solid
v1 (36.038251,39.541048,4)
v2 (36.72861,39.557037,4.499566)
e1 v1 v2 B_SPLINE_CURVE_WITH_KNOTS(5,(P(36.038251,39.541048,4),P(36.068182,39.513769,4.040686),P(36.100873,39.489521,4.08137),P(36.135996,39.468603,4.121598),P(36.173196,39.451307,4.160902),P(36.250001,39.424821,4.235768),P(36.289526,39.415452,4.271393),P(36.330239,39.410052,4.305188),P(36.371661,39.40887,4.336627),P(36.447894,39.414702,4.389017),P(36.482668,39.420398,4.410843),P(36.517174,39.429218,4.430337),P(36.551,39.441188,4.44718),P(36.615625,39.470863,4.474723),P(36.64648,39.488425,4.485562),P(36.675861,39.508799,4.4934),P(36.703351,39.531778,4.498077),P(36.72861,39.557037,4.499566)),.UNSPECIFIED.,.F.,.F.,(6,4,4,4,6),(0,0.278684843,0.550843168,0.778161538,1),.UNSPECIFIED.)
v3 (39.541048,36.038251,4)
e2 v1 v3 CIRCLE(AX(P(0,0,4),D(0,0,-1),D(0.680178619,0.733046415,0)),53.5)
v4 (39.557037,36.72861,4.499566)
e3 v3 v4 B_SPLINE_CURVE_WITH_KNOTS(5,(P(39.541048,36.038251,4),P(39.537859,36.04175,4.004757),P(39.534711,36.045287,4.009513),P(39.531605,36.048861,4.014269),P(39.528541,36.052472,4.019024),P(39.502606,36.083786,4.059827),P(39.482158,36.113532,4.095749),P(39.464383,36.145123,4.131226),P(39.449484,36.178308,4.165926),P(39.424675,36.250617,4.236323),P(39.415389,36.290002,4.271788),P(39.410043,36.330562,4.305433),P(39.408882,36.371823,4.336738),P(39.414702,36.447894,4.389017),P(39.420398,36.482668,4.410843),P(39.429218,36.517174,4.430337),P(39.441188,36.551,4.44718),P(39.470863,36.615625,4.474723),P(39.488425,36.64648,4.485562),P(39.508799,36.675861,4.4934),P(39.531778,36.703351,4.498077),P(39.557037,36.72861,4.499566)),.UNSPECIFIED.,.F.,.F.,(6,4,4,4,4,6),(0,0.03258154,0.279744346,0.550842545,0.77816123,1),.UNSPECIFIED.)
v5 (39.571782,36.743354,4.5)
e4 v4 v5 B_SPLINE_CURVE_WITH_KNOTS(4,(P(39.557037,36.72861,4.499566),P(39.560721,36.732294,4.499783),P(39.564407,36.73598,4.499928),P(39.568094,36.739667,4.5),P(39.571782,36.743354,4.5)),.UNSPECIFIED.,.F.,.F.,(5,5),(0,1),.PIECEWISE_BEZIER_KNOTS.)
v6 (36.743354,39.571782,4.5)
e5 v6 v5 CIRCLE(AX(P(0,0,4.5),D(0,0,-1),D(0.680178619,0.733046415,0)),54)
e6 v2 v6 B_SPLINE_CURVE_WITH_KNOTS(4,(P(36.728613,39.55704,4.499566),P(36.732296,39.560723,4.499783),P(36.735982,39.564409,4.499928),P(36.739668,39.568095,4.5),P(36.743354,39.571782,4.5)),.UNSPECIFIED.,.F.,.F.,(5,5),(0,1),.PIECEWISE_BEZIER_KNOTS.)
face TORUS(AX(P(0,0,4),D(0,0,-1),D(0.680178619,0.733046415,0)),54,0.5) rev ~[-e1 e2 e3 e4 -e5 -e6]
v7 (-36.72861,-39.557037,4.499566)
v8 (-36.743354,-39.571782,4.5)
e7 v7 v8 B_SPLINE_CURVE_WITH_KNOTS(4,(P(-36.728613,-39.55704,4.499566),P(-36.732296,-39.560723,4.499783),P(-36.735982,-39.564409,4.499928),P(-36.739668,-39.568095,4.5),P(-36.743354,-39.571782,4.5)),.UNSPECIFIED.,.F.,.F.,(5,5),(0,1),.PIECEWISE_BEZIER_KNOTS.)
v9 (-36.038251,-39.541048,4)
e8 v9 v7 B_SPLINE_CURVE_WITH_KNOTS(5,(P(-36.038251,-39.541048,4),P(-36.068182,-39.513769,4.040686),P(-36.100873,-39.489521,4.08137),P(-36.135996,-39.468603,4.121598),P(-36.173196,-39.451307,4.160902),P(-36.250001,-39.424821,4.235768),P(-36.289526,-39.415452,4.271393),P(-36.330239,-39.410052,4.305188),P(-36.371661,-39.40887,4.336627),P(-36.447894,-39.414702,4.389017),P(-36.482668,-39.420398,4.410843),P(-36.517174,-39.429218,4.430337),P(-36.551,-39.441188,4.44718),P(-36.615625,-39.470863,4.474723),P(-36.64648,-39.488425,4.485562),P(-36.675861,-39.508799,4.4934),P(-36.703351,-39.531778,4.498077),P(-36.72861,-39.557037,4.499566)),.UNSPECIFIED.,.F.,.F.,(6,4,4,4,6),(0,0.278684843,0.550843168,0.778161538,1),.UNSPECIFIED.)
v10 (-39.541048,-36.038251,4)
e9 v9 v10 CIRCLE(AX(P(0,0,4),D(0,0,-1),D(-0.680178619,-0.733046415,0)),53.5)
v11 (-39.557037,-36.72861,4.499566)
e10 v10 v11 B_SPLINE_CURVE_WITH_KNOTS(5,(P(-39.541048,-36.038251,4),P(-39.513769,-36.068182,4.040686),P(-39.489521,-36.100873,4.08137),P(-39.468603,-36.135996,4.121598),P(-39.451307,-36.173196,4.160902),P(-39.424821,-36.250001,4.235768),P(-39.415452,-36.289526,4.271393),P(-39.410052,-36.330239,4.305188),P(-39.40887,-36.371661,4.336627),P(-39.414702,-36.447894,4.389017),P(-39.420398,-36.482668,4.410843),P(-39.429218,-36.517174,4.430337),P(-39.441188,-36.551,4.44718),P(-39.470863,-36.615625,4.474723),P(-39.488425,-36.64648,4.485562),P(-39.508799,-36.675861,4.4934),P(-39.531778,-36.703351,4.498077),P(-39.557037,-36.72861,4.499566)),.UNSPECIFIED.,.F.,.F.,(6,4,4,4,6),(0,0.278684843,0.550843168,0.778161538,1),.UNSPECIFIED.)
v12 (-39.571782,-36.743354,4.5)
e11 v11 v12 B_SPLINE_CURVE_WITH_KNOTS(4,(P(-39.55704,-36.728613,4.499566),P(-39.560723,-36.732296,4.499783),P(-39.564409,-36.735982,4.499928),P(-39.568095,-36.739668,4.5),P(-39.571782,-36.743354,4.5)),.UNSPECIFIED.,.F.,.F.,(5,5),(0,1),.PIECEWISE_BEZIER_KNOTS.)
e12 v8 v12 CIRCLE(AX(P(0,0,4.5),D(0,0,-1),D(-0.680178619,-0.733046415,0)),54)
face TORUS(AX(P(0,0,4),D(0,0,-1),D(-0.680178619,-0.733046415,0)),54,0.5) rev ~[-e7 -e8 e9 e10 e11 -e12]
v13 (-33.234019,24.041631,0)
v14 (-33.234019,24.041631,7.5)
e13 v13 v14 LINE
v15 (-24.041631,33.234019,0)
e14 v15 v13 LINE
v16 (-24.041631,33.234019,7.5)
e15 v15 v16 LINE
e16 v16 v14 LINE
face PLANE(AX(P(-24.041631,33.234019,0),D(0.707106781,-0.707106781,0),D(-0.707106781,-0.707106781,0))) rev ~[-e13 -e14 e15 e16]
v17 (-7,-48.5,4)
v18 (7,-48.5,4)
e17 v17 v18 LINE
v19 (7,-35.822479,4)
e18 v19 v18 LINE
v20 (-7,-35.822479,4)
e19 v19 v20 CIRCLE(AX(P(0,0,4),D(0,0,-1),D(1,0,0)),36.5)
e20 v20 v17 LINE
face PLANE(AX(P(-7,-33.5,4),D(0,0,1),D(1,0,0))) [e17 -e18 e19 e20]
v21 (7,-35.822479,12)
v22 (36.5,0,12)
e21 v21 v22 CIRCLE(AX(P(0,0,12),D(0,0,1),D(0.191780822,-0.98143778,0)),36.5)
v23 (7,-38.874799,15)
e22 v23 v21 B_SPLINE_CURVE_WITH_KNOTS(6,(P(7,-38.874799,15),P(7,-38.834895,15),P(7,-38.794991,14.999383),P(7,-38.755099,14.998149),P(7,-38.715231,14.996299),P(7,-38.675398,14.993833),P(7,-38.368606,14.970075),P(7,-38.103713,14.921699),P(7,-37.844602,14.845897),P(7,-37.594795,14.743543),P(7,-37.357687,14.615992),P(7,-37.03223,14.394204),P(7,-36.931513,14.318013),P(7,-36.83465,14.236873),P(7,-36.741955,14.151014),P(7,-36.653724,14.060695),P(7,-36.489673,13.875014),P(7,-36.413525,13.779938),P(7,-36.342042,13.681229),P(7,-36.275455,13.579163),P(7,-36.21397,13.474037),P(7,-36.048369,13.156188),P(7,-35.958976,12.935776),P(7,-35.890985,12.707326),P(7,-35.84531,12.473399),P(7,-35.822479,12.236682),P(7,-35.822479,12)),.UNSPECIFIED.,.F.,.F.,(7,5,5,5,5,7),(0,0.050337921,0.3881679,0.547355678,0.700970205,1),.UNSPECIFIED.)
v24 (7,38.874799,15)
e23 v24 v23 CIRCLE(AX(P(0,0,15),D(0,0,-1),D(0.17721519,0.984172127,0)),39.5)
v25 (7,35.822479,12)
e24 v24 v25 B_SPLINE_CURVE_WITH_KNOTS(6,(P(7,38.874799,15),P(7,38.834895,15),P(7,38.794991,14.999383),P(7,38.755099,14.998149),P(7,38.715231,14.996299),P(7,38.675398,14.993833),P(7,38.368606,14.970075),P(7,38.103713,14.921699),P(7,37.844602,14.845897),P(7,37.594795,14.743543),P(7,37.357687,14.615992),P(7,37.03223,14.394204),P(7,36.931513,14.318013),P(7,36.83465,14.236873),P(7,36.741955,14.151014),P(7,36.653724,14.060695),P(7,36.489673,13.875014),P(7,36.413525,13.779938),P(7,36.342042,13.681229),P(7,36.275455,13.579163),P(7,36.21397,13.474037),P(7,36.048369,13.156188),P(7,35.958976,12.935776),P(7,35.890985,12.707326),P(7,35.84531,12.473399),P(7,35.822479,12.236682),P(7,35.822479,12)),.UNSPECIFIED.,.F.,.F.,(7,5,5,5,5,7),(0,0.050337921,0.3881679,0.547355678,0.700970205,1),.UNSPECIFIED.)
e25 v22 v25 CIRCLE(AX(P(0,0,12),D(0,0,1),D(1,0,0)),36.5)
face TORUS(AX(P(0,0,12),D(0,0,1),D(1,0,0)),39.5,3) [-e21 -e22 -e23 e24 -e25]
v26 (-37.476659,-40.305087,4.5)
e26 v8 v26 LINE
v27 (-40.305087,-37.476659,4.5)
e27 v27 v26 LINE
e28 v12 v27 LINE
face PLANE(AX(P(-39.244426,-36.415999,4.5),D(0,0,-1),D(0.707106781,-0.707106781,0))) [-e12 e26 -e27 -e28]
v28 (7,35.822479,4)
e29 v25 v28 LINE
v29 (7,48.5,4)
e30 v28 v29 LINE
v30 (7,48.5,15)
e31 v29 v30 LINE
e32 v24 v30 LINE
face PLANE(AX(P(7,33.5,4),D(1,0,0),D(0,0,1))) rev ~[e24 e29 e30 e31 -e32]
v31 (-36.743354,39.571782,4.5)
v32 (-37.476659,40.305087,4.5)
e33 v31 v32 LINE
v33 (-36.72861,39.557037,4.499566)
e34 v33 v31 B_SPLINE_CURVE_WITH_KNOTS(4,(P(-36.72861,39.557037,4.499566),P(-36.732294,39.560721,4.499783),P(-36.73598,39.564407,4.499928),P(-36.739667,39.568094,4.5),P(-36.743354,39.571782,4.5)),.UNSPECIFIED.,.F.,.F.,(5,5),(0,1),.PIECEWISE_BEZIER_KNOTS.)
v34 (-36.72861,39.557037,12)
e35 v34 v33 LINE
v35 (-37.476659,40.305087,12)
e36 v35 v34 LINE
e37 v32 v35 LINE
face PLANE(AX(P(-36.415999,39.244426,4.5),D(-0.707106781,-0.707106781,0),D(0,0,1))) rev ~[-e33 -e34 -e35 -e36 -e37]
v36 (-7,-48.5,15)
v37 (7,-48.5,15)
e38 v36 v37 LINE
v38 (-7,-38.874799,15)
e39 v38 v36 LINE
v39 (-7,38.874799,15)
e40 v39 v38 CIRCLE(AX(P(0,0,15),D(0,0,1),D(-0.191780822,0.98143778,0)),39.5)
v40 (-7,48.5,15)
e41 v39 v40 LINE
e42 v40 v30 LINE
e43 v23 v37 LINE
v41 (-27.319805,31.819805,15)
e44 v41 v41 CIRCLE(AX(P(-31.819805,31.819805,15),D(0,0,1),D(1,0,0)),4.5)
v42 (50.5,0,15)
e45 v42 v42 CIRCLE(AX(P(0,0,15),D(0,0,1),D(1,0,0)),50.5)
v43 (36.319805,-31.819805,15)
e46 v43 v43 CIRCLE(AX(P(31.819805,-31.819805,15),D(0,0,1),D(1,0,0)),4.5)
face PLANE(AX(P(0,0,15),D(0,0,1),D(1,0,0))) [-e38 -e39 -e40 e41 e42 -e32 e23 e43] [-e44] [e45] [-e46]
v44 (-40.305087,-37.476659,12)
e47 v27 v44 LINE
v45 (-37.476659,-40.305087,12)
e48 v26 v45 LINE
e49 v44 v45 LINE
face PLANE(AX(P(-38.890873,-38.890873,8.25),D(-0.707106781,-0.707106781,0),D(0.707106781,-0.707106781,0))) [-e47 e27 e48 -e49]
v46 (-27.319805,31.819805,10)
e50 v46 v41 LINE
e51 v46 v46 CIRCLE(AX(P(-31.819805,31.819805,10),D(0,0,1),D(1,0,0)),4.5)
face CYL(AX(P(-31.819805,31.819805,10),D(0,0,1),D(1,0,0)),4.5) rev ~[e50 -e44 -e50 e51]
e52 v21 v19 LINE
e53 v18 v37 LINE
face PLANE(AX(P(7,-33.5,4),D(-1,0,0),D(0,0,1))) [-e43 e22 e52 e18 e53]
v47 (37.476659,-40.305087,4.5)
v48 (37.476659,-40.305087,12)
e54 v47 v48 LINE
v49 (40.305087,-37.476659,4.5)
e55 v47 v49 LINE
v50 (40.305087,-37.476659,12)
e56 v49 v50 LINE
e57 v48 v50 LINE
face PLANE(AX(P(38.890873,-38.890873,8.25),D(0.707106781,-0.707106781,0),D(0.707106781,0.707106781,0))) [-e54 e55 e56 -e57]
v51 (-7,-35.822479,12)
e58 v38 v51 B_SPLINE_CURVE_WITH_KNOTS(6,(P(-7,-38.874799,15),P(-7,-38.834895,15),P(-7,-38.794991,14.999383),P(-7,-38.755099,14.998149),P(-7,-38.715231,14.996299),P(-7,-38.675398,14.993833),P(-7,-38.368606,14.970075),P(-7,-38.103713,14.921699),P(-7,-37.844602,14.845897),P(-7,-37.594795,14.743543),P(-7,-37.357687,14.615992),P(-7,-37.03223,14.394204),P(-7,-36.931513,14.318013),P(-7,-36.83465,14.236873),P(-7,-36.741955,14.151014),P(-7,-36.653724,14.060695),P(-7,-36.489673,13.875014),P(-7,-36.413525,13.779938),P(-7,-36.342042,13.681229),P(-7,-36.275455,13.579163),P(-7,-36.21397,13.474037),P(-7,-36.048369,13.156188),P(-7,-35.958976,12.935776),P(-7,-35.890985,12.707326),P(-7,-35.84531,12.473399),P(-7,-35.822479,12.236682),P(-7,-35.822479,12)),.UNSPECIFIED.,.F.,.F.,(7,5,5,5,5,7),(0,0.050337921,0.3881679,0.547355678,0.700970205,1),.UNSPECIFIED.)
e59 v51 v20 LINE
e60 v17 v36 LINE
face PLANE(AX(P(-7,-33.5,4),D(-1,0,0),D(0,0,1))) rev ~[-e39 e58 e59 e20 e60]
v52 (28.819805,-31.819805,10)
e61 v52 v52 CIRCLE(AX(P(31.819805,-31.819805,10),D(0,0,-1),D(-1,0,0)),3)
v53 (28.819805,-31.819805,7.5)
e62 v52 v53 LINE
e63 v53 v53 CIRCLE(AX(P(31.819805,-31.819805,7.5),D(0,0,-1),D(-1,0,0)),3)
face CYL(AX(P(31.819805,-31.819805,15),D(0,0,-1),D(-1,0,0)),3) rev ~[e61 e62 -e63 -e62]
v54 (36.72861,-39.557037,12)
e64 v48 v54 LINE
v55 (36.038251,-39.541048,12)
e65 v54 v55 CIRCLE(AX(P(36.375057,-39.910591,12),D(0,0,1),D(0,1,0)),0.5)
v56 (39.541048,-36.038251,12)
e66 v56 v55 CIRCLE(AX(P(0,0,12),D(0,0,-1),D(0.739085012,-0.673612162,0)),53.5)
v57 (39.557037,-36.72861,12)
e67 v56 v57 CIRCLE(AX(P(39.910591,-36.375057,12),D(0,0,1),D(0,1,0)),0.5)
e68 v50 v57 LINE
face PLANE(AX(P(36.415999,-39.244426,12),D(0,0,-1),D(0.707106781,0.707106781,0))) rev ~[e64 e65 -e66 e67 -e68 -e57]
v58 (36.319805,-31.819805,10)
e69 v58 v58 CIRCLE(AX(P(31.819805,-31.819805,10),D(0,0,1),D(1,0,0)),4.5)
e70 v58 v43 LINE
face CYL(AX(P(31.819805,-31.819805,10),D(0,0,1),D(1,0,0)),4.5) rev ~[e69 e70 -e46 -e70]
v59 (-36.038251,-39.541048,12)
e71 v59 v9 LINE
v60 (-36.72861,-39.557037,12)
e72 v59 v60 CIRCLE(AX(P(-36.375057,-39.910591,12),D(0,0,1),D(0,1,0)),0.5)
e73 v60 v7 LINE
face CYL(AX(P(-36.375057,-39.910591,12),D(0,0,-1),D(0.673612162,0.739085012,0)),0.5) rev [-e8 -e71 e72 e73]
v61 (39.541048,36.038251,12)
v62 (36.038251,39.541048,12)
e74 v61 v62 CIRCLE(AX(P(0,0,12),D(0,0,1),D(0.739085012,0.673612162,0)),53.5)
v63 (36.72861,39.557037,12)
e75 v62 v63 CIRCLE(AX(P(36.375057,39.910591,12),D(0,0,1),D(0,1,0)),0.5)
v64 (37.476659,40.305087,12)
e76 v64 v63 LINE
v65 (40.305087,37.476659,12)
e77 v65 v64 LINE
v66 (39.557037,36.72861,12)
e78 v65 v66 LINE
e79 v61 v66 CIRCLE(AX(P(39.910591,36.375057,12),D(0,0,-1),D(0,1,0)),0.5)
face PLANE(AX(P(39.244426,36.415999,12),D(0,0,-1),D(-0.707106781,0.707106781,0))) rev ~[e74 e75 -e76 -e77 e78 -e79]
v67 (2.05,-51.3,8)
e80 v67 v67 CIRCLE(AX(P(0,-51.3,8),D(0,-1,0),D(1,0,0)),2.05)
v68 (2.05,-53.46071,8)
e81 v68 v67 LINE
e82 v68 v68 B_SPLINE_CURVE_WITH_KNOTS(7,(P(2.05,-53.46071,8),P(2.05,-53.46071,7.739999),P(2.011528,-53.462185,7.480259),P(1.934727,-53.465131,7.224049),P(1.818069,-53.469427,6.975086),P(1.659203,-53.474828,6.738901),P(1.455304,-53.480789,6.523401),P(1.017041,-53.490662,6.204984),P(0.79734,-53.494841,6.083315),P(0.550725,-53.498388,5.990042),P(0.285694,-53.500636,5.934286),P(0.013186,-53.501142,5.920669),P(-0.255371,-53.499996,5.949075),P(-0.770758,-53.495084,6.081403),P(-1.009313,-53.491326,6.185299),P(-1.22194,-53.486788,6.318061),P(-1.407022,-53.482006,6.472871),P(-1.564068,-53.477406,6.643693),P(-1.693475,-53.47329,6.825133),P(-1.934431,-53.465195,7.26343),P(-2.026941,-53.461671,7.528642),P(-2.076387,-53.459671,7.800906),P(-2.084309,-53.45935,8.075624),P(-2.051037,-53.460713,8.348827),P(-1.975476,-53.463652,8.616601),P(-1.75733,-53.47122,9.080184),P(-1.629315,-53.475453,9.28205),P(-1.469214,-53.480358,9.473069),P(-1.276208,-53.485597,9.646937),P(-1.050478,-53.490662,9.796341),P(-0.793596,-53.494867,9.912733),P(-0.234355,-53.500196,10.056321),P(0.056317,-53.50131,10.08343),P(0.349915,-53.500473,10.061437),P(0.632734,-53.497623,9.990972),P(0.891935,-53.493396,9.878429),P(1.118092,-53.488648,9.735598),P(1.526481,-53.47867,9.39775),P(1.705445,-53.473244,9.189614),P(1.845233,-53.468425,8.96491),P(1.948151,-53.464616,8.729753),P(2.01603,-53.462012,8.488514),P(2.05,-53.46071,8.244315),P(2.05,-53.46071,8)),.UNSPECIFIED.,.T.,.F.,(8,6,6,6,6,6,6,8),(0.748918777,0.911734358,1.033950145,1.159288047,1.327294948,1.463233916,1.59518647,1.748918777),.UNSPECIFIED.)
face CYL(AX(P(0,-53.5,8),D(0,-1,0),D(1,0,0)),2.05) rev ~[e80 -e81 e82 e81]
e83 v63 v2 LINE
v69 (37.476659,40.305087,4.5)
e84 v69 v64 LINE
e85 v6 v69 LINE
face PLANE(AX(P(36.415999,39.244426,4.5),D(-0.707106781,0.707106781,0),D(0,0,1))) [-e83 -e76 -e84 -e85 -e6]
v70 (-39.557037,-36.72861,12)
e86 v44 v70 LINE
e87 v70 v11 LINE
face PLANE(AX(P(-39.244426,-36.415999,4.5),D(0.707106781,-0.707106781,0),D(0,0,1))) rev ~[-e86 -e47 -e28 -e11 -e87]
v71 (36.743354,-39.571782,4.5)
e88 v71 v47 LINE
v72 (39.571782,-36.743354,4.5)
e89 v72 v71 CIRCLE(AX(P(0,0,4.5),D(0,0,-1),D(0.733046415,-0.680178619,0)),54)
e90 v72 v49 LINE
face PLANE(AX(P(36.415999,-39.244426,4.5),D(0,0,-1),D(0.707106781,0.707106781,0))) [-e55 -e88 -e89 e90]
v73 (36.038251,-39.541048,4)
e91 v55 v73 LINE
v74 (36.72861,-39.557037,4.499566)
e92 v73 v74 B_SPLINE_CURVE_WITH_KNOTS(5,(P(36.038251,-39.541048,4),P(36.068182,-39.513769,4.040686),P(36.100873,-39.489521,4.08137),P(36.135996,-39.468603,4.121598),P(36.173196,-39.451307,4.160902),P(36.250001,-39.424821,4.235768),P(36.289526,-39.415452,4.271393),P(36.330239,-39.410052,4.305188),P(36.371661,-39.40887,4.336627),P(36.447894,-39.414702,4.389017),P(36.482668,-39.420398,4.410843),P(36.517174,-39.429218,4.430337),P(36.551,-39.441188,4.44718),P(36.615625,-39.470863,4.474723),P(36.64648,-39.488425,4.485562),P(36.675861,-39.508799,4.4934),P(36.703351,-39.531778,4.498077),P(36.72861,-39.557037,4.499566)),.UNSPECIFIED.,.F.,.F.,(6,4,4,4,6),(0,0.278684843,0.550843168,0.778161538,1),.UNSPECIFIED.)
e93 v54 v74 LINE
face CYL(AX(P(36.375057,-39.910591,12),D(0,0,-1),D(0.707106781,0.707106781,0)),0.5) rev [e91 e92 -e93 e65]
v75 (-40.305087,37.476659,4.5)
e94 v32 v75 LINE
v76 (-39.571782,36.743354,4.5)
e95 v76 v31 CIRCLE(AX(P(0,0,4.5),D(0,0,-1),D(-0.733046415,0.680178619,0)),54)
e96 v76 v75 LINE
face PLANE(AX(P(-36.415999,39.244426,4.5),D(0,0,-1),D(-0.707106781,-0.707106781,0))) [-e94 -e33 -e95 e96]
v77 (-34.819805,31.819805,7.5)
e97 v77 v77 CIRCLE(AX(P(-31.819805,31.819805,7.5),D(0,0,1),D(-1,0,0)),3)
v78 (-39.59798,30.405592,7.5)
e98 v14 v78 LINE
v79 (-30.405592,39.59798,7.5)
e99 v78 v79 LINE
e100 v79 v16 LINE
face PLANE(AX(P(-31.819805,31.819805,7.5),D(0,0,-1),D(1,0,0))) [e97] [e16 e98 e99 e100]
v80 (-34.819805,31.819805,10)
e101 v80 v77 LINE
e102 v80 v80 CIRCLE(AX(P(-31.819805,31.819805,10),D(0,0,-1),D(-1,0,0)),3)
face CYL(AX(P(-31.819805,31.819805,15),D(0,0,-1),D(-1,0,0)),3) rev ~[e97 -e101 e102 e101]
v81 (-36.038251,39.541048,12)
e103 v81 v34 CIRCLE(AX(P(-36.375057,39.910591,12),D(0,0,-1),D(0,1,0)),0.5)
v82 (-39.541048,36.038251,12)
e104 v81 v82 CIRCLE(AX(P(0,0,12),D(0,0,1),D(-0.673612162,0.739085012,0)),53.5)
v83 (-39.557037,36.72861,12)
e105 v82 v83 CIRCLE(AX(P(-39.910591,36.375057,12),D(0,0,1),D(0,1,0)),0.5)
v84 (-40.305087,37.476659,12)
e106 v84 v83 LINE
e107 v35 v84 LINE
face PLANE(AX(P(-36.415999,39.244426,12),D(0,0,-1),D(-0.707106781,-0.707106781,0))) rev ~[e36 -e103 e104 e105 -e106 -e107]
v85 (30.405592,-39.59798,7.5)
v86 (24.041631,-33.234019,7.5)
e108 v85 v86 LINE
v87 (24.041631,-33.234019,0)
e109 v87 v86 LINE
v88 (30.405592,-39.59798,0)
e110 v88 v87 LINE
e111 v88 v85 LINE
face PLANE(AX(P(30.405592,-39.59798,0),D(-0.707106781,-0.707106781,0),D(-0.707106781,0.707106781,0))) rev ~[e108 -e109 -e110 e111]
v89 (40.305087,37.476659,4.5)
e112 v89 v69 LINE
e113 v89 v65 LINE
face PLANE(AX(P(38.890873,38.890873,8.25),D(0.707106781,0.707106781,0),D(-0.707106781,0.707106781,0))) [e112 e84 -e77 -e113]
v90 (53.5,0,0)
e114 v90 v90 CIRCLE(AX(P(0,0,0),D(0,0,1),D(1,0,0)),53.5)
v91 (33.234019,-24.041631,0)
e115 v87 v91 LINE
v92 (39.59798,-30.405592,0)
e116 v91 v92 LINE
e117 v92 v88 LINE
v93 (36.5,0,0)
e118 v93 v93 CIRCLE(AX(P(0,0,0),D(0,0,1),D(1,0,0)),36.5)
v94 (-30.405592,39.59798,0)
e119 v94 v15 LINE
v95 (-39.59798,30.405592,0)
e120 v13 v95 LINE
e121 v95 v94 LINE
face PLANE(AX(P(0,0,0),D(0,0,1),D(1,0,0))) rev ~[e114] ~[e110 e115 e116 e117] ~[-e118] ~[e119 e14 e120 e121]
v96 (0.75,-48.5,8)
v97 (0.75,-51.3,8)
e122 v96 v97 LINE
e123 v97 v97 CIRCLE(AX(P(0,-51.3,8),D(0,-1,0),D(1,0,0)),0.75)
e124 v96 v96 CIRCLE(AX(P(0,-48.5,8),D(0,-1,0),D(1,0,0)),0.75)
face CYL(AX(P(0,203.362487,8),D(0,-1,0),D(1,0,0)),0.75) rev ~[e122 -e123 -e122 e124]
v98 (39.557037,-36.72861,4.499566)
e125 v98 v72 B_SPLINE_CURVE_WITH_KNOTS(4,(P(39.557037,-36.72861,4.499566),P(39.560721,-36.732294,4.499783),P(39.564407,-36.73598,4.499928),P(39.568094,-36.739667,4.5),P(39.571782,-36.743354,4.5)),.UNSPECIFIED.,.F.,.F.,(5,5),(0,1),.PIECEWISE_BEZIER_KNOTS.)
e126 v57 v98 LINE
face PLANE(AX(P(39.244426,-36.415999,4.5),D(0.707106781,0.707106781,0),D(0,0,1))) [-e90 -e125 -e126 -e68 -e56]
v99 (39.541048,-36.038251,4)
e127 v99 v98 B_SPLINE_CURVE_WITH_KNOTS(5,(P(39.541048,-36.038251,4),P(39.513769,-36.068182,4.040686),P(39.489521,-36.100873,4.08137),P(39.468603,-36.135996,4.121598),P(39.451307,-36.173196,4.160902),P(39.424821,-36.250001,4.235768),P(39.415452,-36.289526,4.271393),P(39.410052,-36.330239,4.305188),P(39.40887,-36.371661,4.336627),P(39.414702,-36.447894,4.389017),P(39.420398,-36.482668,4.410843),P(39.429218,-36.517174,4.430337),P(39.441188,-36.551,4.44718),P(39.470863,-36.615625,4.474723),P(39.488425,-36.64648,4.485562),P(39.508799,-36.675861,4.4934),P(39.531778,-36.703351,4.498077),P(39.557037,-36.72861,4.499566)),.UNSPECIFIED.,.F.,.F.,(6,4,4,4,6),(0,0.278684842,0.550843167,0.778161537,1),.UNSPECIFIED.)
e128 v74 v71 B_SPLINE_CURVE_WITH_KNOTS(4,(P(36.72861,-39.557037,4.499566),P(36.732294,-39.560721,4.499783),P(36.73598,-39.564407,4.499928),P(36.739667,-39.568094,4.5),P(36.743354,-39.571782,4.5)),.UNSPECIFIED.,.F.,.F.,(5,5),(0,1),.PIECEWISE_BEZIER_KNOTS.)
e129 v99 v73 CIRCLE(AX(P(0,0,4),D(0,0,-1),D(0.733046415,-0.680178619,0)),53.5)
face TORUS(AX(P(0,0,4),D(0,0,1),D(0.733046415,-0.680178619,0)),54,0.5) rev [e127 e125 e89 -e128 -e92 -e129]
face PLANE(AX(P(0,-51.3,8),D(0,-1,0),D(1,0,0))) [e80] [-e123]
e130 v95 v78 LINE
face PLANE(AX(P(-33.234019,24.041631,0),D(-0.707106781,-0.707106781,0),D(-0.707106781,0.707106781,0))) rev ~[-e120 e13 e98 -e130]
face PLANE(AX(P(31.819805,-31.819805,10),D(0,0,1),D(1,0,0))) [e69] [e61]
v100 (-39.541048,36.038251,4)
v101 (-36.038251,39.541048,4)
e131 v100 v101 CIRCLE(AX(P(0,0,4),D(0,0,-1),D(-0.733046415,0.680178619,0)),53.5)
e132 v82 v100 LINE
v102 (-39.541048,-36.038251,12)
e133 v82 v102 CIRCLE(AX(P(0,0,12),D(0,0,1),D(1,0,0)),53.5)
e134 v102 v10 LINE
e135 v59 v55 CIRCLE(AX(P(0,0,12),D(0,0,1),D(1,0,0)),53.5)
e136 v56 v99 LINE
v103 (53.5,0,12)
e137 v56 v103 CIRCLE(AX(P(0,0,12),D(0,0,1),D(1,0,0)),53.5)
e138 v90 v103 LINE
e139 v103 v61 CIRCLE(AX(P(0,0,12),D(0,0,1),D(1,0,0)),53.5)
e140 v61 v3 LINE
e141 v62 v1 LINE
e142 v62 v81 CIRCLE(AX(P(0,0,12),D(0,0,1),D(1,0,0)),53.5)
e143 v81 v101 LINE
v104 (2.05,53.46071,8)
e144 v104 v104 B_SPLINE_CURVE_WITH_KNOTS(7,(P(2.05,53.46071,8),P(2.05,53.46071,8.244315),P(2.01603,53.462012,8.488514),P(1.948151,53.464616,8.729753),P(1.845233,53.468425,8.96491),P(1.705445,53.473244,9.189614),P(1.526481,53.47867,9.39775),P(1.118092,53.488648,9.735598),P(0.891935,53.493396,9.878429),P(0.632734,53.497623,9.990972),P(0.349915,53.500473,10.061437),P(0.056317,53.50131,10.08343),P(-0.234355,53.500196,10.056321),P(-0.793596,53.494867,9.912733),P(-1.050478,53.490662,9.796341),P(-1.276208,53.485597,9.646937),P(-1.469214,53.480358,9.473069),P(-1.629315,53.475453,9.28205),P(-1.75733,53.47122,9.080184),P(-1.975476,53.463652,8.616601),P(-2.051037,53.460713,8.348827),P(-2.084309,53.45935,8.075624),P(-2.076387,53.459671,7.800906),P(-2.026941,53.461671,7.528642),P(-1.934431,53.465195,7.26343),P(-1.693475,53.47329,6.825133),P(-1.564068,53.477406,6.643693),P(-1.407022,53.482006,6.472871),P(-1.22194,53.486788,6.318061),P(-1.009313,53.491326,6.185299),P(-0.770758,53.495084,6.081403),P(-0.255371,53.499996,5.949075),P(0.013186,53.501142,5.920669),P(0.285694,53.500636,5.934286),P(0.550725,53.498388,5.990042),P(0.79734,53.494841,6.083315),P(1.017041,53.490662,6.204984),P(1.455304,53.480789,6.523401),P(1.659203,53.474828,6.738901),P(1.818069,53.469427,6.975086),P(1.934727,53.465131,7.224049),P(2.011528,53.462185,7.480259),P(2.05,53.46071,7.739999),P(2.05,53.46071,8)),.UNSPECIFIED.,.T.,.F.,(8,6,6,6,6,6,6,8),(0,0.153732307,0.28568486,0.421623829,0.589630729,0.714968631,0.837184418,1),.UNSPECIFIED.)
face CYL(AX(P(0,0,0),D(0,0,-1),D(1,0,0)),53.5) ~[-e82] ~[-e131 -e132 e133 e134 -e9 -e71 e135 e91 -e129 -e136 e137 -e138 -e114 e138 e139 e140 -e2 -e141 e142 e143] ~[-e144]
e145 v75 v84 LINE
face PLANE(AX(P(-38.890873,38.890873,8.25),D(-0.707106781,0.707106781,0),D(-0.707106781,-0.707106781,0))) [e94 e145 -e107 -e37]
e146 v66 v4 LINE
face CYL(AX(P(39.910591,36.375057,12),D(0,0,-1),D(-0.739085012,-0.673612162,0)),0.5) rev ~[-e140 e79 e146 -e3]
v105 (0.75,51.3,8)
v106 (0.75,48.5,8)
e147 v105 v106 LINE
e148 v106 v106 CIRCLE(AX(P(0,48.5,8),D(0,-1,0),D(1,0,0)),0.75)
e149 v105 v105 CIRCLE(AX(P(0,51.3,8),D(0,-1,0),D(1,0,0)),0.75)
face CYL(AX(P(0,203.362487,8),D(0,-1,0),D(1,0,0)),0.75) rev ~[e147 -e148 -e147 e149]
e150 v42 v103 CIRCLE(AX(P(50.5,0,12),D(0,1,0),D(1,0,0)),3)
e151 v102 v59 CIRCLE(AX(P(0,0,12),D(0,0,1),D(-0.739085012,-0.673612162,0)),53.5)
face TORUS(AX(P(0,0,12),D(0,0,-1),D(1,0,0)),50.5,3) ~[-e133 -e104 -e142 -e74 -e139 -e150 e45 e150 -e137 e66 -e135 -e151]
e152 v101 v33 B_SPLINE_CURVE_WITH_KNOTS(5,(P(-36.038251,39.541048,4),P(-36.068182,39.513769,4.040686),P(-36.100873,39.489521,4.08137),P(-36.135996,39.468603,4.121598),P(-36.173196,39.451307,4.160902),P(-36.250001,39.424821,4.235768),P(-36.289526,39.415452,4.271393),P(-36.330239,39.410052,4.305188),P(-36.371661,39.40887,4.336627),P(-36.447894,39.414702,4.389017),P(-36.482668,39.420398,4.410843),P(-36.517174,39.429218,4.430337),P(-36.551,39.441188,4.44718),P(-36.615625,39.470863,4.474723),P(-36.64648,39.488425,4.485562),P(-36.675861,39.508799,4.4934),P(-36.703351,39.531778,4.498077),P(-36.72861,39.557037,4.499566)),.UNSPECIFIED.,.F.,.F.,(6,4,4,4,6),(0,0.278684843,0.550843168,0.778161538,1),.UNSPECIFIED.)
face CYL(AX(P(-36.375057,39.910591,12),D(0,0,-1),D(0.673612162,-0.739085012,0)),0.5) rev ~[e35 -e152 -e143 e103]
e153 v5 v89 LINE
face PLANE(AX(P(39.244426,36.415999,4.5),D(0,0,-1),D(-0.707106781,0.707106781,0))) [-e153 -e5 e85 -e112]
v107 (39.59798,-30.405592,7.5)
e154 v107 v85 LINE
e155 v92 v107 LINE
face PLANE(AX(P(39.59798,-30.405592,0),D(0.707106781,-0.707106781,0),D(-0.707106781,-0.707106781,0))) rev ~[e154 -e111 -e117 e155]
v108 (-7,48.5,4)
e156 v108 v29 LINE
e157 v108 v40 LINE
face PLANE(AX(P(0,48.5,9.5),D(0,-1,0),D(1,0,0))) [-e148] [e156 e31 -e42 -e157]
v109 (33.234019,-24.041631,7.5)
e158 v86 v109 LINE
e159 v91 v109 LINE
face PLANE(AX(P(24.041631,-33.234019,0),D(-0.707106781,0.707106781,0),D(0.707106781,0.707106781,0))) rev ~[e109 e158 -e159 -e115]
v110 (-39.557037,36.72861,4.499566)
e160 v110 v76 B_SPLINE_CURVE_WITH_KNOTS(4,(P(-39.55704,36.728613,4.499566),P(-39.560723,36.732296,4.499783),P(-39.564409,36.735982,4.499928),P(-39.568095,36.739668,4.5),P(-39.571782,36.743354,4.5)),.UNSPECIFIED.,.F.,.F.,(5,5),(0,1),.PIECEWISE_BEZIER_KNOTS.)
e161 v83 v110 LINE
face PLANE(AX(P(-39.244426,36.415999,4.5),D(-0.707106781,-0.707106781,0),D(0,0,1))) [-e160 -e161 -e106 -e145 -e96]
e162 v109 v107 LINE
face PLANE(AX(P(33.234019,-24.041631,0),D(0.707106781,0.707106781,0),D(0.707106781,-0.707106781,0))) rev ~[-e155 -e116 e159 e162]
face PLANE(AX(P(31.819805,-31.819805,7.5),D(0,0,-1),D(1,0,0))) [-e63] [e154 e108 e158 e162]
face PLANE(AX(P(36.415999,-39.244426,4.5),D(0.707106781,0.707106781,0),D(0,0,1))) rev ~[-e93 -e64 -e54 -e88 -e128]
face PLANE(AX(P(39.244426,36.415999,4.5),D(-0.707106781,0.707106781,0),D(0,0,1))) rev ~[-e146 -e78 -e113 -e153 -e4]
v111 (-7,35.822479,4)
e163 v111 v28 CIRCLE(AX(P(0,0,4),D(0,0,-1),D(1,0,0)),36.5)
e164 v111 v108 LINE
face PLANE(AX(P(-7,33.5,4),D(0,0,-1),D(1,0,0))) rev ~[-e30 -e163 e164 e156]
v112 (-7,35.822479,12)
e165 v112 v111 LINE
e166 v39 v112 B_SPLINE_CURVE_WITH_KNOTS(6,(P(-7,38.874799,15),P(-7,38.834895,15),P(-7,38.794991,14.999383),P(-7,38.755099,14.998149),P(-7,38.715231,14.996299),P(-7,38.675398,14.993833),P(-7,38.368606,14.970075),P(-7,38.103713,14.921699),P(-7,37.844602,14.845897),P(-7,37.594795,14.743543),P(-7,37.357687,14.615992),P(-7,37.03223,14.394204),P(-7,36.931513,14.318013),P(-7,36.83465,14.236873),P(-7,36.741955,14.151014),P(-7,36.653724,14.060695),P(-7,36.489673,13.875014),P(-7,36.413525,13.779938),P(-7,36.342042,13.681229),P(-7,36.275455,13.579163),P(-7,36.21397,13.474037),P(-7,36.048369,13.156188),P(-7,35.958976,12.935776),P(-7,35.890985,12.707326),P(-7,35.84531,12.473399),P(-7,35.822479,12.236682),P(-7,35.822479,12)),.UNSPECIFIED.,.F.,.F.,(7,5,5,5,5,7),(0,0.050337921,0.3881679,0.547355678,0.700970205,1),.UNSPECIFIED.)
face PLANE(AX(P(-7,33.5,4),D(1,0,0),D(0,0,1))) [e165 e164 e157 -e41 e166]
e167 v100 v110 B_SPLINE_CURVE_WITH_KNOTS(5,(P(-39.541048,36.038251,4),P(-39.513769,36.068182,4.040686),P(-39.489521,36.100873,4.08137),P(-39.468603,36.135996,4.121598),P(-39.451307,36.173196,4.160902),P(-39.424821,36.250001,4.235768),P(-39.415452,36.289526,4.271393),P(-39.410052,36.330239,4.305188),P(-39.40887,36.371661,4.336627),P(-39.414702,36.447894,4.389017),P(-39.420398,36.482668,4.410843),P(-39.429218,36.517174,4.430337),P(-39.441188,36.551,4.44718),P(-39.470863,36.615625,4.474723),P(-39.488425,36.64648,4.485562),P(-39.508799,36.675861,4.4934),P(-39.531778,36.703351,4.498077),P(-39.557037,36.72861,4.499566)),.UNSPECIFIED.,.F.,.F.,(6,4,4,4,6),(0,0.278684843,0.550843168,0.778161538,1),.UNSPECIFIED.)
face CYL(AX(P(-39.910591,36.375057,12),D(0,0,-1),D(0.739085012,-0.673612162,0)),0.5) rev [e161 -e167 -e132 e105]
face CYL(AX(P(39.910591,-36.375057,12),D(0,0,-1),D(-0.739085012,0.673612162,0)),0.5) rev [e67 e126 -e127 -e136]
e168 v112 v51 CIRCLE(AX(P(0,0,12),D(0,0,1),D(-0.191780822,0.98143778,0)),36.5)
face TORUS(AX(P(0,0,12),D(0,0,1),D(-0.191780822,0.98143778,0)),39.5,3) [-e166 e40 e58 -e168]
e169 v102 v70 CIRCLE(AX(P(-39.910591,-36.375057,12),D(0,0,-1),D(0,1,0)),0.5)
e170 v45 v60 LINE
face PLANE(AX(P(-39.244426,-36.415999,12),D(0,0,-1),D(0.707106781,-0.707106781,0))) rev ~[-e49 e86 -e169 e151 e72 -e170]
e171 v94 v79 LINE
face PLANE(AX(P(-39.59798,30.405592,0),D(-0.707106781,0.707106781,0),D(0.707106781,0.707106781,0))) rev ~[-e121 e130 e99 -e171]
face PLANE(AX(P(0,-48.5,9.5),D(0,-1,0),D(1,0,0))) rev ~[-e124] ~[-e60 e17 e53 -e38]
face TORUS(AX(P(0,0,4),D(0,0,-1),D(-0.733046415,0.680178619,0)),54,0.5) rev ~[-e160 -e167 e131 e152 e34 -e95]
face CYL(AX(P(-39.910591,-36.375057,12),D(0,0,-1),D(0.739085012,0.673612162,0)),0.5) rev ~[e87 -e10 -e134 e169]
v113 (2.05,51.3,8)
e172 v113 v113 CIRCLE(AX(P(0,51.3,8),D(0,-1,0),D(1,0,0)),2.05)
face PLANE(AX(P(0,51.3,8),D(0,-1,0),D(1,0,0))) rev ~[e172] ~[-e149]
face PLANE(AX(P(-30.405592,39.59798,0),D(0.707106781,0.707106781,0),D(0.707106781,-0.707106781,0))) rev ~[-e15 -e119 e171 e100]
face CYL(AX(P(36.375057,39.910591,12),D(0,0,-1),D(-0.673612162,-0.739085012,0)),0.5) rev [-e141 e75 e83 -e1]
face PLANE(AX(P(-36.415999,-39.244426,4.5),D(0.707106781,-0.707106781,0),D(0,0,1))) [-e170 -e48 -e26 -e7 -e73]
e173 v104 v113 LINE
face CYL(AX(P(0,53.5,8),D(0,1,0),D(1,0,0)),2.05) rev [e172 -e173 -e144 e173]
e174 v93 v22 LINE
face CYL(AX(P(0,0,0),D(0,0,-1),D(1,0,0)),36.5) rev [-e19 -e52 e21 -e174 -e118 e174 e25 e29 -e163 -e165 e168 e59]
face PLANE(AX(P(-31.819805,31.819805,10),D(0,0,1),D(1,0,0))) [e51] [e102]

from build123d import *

# Parameters (mm, degrees)
F0_R             = 53.5
F0_R_2           = 36.5
F1_DEPTH         = 15
F5_D             = 6
F5_CBORE_D       = 9
F5_CBORE_DEPTH   = 5
F7_W             = 14
F7_H             = 11
F8_DEPTH         = 15
F10_W            = 14
F10_H            = 11
F11_DEPTH        = 15
F13_R            = 2.05
F14_DEPTH        = 2.2
F16_R            = 2.05
F17_DEPTH        = 2.2
F18_R            = 3
F19_DEPTH        = 7.5
F20_DEPTH        = 7.5
F21_R            = 3
F22_R            = 3
F25_W            = 4
F25_H            = 7.5
F26_DEPTH        = 1.5
F26_COPIES_COUNT = 4
F27_R            = 0.5
F29_D            = 1.5


# Not quite as in the source:
# - a pattern or mirror of a feature is missing from the dataset's text; its kind, count and spacing are read off the source's solid


with BuildPart() as f1:
    # F0 (on Top) → F1 (new body)
    with BuildSketch(Plane.XY):
        Circle(F0_R)
        Circle(F0_R_2, mode=Mode.SUBTRACT)
    extrude(amount=F1_DEPTH)

    # F5 (through all)
    with Locations(Plane.XY.offset(15)):
        with Locations((-31.8198051534, 31.8198051534), (31.8198051534, -31.8198051534)):
            CounterBoreHole(F5_D / 2, F5_CBORE_D / 2, F5_CBORE_DEPTH)

    # F7 (on plane+point) → F8 (cut)
    with BuildSketch(Plane.XZ.offset(-33.5)):
        with Locations((0, 9.5)):
            Rectangle(F7_W, F7_H)
    extrude(amount=-F8_DEPTH, mode=Mode.SUBTRACT)

    # F10 (on plane+point) → F11 (cut)
    with BuildSketch(Plane.XZ.offset(33.5)):
        with Locations((0, 9.5)):
            Rectangle(F10_W, F10_H)
    extrude(amount=F11_DEPTH, mode=Mode.SUBTRACT)

    # F13 (on plane+point) → F14 (cut)
    with BuildSketch(Plane.XZ.offset(53.5)):
        with Locations((0, 8)):
            Circle(F13_R)
    extrude(amount=-F14_DEPTH, mode=Mode.SUBTRACT)

    # F16 (on plane+point) → F17 (cut)
    with BuildSketch(Plane.XZ.offset(-53.5)):
        with Locations((0, 8)):
            Circle(F16_R)
    extrude(amount=F17_DEPTH, mode=Mode.SUBTRACT)

    # F18 (on face) → F19 (cut)
    with BuildSketch(Plane(origin=(0, 0, 0), x_dir=(1, 0, 0), z_dir=(0, 0, -1))):
        Polygon((-33.2340187158, -24.0416305603), (-39.5979797464, -30.405591591), (-30.405591591, -39.5979797464), (-24.0416305603, -33.2340187158), align=None)
        with Locations((-31.8198051534, -31.8198051534)):
            Circle(F18_R, mode=Mode.SUBTRACT)
    extrude(amount=-F19_DEPTH, mode=Mode.SUBTRACT)

    # F18 (on face) → F20 (cut)
    with BuildSketch(Plane(origin=(0, 0, 0), x_dir=(1, 0, 0), z_dir=(0, 0, -1))):
        Polygon((-33.2340187158, -24.0416305603), (-39.5979797464, -30.405591591), (-30.405591591, -39.5979797464), (-24.0416305603, -33.2340187158), align=None)
        Polygon((30.405591591, 39.5979797464), (24.0416305603, 33.2340187158), (33.2340187158, 24.0416305603), (39.5979797464, 30.405591591), align=None)
    extrude(amount=-F20_DEPTH, mode=Mode.SUBTRACT)

    # F21
    f21_edges = [f1.edges().sort_by_distance(p)[0] for p in [
        (-36.5, 0, 15),
    ]]
    fillet(f21_edges, radius=F21_R)

    # F22
    f22_edges = [f1.edges().sort_by_distance(p)[0] for p in [
        (-53.5, 0, 15),
        (28.175787, 23.202909, 15),
        (28.175787, -23.202909, 15),
    ]]
    fillet(f22_edges, radius=F22_R)

    # F25 (on face) → F26 (join, symmetric)
    with BuildSketch(Plane(origin=(37.8302127935, 37.8302127935, 0), x_dir=(-0.7071067812, 0.7071067812, 0), z_dir=(0.7071067812, 0.7071067812, 0))):
        with Locations((0, 8.25)):
            Rectangle(F25_W, F25_H)
    f26 = extrude(amount=F26_DEPTH, both=True)

    # F26_copies: F26 ×4 about axis
    f26_copies_axis = Axis((0, 0, 0), (0, 0, 1))
    for i in range(1, F26_COPIES_COUNT):
        add(f26.rotate(f26_copies_axis, i * 360 / F26_COPIES_COUNT))

    # F27
    f27_edges = [f1.edges().sort_by_distance(p)[0] for p in [
        (39.217983, 36.389556, 8.25),
        (36.389556, 39.217983, 8.25),
        (37.830213, 37.830213, 4.5),
        (39.217983, -36.389556, 8.25),
        (37.830213, -37.830213, 4.5),
        (36.389556, -39.217983, 8.25),
        (-36.389556, -39.217983, 8.25),
        (-37.830213, -37.830213, 4.5),
        (-39.217983, -36.389556, 8.25),
        (-39.217983, 36.389556, 8.25),
        (-37.830213, 37.830213, 4.5),
        (-36.389556, 39.217983, 8.25),
    ]]
    fillet(f27_edges, radius=F27_R)

    # F29 (through all)
    with Locations(Plane(origin=(0, 51.3, 0), x_dir=(-1, 0, 0), z_dir=(0, 1, 0))):
        with Locations((0, 8)):
            Hole(F29_D / 2)


solid = f1.part
